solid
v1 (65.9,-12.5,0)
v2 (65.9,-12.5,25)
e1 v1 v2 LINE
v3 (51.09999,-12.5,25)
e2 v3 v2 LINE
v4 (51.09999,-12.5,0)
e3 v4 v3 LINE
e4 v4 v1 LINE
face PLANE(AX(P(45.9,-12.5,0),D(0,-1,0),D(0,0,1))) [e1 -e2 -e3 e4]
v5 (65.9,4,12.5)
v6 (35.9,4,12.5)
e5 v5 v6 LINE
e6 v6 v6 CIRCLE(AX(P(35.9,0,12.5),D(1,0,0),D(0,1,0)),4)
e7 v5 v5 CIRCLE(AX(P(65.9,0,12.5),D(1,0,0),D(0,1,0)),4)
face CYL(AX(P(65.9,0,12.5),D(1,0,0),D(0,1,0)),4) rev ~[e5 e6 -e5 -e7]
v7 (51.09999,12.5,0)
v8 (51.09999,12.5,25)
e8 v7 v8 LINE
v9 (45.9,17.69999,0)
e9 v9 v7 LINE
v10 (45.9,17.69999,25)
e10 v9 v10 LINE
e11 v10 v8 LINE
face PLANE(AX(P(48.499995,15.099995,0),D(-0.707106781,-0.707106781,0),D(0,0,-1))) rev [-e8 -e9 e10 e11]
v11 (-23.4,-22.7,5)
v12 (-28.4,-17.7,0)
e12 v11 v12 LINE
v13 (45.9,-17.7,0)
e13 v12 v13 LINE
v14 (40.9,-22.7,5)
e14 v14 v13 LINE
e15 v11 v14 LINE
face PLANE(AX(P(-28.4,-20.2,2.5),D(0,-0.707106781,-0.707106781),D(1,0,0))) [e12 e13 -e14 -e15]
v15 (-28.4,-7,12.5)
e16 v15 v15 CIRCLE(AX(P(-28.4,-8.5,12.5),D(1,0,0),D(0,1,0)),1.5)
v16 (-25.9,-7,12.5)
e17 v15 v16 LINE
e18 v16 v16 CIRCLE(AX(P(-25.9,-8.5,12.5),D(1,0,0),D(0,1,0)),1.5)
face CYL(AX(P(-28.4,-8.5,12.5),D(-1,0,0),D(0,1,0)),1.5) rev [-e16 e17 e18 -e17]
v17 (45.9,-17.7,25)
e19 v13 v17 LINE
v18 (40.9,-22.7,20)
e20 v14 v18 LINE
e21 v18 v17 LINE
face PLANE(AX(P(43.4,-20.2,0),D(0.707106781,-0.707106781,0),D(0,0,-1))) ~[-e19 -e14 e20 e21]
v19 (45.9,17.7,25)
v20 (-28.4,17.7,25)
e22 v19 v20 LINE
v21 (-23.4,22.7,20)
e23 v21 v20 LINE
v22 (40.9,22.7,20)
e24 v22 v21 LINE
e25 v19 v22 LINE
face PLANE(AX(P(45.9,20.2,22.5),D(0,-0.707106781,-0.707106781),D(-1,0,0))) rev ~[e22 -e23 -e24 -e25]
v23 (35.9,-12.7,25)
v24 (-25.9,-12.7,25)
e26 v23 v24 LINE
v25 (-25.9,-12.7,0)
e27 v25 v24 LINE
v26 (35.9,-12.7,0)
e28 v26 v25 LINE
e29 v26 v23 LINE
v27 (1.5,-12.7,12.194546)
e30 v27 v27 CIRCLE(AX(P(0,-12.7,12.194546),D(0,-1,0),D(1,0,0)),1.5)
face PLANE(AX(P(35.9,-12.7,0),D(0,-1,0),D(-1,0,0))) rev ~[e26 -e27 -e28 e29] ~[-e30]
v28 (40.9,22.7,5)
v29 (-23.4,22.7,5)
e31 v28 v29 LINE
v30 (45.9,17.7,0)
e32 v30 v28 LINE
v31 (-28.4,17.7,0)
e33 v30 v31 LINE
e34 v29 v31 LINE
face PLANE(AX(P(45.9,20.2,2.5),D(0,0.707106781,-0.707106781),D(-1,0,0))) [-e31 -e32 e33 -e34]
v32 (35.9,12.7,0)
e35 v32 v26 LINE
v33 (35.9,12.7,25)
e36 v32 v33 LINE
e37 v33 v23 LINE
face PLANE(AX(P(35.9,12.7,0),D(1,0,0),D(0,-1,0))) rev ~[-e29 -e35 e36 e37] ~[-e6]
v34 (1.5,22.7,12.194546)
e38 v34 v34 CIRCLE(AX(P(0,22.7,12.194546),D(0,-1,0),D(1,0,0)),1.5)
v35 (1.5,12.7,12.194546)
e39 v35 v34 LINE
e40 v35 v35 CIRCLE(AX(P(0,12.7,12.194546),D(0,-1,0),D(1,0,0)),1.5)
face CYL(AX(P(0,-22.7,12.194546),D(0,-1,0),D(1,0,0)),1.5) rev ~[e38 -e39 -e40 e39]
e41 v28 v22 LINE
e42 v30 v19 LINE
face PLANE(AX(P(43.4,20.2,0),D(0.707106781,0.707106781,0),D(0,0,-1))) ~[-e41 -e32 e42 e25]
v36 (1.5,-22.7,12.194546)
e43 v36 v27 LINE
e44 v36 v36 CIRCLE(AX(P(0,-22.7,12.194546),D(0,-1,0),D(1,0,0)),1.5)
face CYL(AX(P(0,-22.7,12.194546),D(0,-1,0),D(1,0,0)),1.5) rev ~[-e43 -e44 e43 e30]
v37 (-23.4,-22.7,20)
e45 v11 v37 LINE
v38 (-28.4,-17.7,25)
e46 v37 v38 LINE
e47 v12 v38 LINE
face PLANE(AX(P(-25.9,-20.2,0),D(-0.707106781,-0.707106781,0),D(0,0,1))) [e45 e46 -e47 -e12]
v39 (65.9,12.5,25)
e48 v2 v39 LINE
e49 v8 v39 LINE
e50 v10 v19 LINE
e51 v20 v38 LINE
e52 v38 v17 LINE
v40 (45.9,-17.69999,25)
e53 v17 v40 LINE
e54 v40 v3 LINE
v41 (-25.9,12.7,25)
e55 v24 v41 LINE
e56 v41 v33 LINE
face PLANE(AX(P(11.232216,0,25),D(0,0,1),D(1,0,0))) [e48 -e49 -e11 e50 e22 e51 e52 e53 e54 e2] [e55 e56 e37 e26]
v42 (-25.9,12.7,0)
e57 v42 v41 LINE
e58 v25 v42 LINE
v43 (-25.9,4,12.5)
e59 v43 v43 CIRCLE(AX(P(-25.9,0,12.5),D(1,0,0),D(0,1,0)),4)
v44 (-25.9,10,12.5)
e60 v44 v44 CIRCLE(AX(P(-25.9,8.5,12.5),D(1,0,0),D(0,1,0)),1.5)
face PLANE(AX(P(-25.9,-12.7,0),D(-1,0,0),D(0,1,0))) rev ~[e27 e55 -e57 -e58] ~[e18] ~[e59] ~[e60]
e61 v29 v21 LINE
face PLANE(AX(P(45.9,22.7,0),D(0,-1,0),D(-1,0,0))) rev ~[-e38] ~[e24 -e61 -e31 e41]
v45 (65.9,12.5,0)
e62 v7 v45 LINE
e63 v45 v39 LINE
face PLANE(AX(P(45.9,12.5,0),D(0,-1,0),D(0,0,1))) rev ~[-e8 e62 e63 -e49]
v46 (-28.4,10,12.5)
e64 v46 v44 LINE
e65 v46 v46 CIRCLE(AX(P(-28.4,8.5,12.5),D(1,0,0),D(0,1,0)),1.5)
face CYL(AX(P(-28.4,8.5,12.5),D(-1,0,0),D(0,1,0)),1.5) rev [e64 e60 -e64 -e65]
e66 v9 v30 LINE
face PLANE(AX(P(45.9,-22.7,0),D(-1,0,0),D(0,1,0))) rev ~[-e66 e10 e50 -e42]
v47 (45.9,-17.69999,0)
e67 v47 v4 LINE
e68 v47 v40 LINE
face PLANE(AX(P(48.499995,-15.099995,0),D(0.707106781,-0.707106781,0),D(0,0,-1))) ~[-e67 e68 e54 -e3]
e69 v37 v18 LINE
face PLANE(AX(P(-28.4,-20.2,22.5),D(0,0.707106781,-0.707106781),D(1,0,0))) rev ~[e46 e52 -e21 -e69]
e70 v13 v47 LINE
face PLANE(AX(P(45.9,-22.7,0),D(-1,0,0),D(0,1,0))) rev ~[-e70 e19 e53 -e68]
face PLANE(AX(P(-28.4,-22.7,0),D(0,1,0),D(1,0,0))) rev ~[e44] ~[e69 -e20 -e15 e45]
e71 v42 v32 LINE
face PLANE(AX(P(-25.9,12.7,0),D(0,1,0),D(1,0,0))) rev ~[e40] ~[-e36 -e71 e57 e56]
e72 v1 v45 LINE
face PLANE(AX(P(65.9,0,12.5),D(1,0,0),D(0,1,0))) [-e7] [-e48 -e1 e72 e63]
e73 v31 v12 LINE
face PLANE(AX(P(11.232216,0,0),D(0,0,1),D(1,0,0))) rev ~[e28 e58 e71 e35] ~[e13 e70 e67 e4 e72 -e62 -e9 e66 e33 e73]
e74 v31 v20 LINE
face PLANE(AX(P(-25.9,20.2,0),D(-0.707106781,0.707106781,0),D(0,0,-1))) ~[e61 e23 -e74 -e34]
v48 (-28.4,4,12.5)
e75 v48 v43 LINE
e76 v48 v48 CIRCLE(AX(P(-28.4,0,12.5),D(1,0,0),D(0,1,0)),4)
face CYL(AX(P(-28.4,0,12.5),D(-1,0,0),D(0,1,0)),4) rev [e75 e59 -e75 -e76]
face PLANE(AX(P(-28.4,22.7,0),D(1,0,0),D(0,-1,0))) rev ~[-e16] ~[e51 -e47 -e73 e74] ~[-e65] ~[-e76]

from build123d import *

# Parameters (mm, degrees)
F0_W      = 2.5
F0_H      = 24.4
F1_DEPTH  = 25
F4_R      = 1.5
F4_R_2    = 4
F5_DEPTH  = 2.5
F6_SIZE   = 5
F10_R     = 1.5
F11_DEPTH = 60
F8_W      = 25
F8_H      = 25
F12_DEPTH = 20
F13_SIZE  = 5.19999
F15_R     = 4
F16_DEPTH = 40


# Not quite as in the source:
# - a fillet or chamfer is up to 0.001 mm smaller than in the source, because OpenCascade refuses the exact size


with BuildPart() as f1:
    # F0 (on Top) → F1 (new body)
    with BuildSketch(Plane.XY):
        Polygon((-28.4, 12.2), (-25.9, 12.2), (-25.9, 12.7), (35.9, 12.7), (35.9, -12.7), (-25.9, -12.7), (-25.9, -12.2), (-28.4, -12.2), (-28.4, -22.7), (45.9, -22.7), (45.9, 22.7), (-28.4, 22.7), align=None)
        with Locations((-27.15, 0)):
            Rectangle(F0_W, F0_H)
    extrude(amount=F1_DEPTH)

    # F4 (on offset) → F5 (cut)
    with BuildSketch(Plane.YZ.offset(-28.4)):
        with Locations((-8.5, 12.5)):
            Circle(F4_R)
        with Locations((0, 12.5)):
            Circle(F4_R_2)
        with Locations((8.5, 12.5)):
            Circle(F4_R)
    extrude(amount=F5_DEPTH, mode=Mode.SUBTRACT)

    # F6
    f6_edges = [f1.edges().sort_by_distance(p)[0] for p in [
        (45.9, 22.7, 12.5),
        (-28.4, 22.7, 12.5),
        (8.75, 22.7, 0),
        (8.75, 22.7, 25),
        (-28.4, -22.7, 12.5),
        (45.9, -22.7, 12.5),
        (8.75, -22.7, 0),
        (8.75, -22.7, 25),
    ]]
    chamfer(f6_edges, length=F6_SIZE)

    # F10 (on offset) → F11 (cut)
    with BuildSketch(Plane.XZ.offset(22.7)):
        with Locations((0, 12.1945459396)):
            Circle(F10_R)
    extrude(amount=-F11_DEPTH, mode=Mode.SUBTRACT)

    # F8 (on offset) → F12 (join)
    with BuildSketch(Plane.YZ.offset(45.9)):
        with Locations((0, 12.5)):
            Rectangle(F8_W, F8_H)
    extrude(amount=F12_DEPTH)

    # F13 (size 5.2 in the source; OpenCascade refuses exactly that, so slightly less here)
    f13_edges = [f1.edges().sort_by_distance(p)[0] for p in [
        (45.9, 12.5, 12.5),
        (45.9, -12.5, 12.5),
    ]]
    chamfer(f13_edges, length=F13_SIZE)

    # F15 (on offset) → F16 (cut)
    with BuildSketch(Plane.YZ.offset(65.9)):
        with Locations((0, 12.5)):
            Circle(F15_R)
    extrude(amount=-F16_DEPTH, mode=Mode.SUBTRACT)


solid = f1.part
